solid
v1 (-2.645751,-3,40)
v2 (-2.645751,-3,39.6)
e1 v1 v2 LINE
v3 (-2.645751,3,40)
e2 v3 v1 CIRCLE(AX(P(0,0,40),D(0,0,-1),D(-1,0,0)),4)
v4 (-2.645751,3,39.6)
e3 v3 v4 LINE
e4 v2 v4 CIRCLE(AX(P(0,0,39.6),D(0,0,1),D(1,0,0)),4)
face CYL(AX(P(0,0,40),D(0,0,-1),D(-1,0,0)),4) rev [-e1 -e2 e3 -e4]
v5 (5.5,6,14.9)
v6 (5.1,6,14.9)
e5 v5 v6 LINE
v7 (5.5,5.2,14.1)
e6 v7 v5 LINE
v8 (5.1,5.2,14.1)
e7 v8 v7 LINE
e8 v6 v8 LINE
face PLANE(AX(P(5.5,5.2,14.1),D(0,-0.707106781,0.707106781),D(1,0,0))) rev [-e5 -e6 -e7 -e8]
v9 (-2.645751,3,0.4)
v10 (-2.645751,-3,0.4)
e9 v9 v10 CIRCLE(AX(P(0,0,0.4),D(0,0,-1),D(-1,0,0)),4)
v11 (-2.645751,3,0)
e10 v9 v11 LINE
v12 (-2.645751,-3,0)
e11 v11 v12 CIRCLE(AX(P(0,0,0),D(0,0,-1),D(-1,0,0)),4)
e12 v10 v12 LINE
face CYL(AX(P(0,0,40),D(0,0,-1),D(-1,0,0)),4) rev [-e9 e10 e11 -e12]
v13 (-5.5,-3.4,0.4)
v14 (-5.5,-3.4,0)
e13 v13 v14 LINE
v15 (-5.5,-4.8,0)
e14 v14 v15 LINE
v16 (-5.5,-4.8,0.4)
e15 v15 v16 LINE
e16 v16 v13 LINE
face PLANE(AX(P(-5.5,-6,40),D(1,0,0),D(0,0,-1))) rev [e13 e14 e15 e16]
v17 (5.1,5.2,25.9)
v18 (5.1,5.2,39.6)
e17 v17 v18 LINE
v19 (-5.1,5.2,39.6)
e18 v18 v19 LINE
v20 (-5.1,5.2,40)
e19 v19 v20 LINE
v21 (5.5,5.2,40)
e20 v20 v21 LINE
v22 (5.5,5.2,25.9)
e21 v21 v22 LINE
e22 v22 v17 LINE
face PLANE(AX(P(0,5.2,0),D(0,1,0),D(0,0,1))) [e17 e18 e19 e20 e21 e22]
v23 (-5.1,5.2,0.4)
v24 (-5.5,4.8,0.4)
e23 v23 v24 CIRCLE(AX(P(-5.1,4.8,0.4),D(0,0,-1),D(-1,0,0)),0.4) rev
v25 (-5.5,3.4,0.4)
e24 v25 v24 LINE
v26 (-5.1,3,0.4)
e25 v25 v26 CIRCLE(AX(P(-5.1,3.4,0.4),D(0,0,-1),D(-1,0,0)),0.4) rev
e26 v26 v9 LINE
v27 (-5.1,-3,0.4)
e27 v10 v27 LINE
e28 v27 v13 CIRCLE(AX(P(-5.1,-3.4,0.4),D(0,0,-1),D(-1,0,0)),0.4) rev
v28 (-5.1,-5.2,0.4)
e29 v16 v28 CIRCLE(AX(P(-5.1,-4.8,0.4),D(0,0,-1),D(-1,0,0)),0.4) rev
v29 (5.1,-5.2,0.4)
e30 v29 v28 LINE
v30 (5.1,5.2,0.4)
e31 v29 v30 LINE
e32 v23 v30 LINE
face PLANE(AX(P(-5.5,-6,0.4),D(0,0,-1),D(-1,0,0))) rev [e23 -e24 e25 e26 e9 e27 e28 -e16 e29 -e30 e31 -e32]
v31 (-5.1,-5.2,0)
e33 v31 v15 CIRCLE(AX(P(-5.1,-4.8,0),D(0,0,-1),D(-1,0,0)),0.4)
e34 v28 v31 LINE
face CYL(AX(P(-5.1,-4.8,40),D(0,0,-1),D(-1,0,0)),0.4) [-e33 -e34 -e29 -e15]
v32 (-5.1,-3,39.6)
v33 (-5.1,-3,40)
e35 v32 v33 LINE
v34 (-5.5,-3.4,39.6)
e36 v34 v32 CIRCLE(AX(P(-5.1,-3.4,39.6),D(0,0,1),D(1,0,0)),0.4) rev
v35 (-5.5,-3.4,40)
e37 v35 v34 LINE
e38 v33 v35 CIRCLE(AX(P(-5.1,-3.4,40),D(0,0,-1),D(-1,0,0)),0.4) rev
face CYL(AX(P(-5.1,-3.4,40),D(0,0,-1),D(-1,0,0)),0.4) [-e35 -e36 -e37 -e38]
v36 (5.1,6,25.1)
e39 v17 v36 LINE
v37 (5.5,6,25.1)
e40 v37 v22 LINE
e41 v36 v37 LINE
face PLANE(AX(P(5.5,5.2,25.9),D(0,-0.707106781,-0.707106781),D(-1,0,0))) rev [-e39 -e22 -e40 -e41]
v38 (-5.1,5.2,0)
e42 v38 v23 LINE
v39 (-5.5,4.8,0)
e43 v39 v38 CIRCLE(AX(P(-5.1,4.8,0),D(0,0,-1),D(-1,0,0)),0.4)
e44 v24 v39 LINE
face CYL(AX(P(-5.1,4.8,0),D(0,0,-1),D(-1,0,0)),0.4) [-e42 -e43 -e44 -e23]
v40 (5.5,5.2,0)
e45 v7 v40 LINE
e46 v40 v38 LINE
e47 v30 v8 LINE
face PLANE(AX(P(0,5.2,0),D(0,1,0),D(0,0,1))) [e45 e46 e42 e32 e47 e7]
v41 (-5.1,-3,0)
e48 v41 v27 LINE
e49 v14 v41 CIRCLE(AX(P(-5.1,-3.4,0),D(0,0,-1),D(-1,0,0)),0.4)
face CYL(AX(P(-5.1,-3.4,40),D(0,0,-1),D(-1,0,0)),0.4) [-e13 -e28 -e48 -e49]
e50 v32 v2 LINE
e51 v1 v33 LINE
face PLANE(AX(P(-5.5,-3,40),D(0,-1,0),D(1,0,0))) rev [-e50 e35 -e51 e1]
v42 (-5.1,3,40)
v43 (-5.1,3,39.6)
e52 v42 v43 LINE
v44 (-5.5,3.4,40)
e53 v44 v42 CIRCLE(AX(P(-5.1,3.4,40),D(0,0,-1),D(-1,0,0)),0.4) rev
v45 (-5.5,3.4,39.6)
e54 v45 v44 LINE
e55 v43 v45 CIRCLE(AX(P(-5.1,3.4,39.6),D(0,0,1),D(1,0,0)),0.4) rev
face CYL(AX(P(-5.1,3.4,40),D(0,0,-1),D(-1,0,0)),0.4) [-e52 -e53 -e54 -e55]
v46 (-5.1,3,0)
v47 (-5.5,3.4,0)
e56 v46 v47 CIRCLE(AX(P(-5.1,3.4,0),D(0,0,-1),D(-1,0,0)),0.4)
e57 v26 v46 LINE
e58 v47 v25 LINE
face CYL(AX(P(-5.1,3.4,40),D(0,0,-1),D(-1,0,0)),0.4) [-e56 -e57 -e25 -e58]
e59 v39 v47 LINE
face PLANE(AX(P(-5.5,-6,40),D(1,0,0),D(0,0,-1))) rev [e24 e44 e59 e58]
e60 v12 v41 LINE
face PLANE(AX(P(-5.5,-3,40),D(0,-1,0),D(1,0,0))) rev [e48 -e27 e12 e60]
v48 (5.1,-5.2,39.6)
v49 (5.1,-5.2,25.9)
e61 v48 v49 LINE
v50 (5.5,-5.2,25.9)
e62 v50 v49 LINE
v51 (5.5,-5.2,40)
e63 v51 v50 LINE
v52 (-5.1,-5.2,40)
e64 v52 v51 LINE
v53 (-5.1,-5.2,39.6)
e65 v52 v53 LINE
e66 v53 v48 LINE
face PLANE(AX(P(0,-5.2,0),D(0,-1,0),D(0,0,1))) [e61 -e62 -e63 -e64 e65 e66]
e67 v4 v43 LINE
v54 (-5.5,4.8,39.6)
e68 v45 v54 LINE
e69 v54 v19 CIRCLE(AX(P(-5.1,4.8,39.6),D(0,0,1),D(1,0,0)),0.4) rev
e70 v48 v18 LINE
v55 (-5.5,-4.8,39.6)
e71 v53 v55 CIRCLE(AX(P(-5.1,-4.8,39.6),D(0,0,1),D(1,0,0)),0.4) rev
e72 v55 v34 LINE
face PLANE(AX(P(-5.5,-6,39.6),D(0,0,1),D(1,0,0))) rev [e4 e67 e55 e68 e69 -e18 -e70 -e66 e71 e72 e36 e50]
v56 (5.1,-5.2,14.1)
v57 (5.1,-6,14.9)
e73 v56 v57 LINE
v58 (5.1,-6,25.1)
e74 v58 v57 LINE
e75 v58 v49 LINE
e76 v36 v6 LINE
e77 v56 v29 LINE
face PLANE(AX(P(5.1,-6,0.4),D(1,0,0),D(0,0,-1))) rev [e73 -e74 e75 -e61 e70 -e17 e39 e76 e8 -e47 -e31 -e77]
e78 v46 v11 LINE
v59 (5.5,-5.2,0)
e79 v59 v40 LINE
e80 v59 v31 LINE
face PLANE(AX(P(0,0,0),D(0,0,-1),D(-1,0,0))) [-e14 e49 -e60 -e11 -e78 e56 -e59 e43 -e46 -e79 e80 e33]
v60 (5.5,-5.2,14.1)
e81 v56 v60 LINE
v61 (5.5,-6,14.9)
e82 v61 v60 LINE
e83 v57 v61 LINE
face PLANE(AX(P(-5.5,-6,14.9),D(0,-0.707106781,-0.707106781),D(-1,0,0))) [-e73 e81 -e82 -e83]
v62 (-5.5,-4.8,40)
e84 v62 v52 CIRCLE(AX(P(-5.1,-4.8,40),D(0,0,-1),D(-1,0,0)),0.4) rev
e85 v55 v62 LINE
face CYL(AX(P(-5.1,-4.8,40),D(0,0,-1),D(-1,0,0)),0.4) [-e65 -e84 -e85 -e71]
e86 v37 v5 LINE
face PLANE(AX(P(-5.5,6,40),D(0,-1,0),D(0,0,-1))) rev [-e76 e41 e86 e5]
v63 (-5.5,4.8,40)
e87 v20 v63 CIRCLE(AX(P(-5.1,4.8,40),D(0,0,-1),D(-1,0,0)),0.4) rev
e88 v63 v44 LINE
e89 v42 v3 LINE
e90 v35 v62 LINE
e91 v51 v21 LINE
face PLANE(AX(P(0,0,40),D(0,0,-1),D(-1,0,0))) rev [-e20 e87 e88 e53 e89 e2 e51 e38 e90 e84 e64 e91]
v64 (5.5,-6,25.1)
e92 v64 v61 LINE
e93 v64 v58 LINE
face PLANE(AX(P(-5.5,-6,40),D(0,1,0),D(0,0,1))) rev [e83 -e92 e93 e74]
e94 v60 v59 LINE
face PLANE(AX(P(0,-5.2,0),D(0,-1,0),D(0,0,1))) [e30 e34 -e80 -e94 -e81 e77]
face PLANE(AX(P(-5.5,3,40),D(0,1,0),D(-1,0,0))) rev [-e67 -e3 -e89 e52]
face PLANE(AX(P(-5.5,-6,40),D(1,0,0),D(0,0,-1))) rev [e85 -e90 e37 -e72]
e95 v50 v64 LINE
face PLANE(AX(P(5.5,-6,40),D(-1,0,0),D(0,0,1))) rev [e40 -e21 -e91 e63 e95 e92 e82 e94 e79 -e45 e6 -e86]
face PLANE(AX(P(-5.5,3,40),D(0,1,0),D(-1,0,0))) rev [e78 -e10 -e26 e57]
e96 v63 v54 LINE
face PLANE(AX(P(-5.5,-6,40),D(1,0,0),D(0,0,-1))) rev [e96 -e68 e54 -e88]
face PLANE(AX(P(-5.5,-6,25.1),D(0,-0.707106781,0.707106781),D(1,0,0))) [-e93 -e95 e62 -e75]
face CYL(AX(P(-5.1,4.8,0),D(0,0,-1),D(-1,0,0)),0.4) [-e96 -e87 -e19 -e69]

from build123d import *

# Parameters (mm, degrees)
SKETCH1_W           = 11
SKETCH1_H           = 12
BOSS_EXTRUDE1_DEPTH = 40
SKETCH2_W           = 10.6
SKETCH2_H           = 39.2
CUT_EXTRUDE1_DEPTH  = 43.121847063
CUT_EXTRUDE2_DEPTH  = 0.8
CHAMFER1_SIZE       = 0.8
CUT_EXTRUDE3_DEPTH  = 41.819725624
FILLET1_R           = 0.4


with BuildPart() as part:
    # Sketch1 → Boss-Extrude1 (new body)
    with BuildSketch(Plane.XY):
        Rectangle(SKETCH1_W, SKETCH1_H)
    extrude(amount=BOSS_EXTRUDE1_DEPTH)

    # Sketch2 → Cut-Extrude1 (cut, through all)
    with BuildSketch(Plane(origin=(0, 6, 0), x_dir=(1, 0, 0), z_dir=(0, 1, 0))):
        with Locations((-0.2, -20)):
            Rectangle(SKETCH2_W, SKETCH2_H)
    extrude(amount=-CUT_EXTRUDE1_DEPTH, mode=Mode.SUBTRACT)

    # Sketch3 → Cut-Extrude2 (cut)
    with BuildSketch(Plane(origin=(0, 6, 0), x_dir=(1, 0, 0), z_dir=(0, 1, 0))):
        Polygon((-5.5, 0), (5.5, 0), (5.5, -14.1), (5.1, -14.1), (5.1, -25.9), (5.5, -25.9), (5.5, -40), (-5.5, -40), align=None)
    cut_extrude2 = extrude(amount=-CUT_EXTRUDE2_DEPTH, mode=Mode.SUBTRACT)

    # Mirror1: Cut-Extrude2 across plane
    add(cut_extrude2.mirror(Plane.ZX), mode=Mode.SUBTRACT)

    # Chamfer1
    chamfer1_edges = [part.edges().sort_by_distance(p)[0] for p in [
        (5.3, -6, 25.9),
        (5.3, -6, 14.1),
        (5.3, 6, 25.9),
        (5.3, 6, 14.1),
    ]]
    chamfer(chamfer1_edges, length=CHAMFER1_SIZE - 0.0001)  # a hair under: the kernel refuses the full size

    # Sketch4 → Cut-Extrude3 (cut, through all)
    with BuildSketch(Plane(origin=(0, 0, 0), x_dir=(-1, 0, 0), z_dir=(0, 0, -1))):
        with BuildLine():
            Line((5.5, -3), (2.645751311, -3))
            ThreePointArc((2.645751311, -3), (-4, 0), (2.645751311, 3))
            Line((2.645751311, 3), (5.5, 3))
            Line((5.5, 3), (5.5, -3))
        make_face()
    extrude(amount=-CUT_EXTRUDE3_DEPTH, mode=Mode.SUBTRACT)

    # Fillet1
    fillet1_edges = [part.edges().sort_by_distance(p)[0] for p in [
        (-5.5, 3, 0.2),
        (-5.5, 3, 39.8),
        (-5.5, -3, 0.2),
        (-5.5, -3, 39.8),
        (-5.5, 5.2, 0.2),
        (-5.5, 5.2, 39.8),
        (-5.5, -5.2, 39.8),
        (-5.5, -5.2, 0.2),
    ]]
    fillet(fillet1_edges, radius=FILLET1_R)


solid = part.part
